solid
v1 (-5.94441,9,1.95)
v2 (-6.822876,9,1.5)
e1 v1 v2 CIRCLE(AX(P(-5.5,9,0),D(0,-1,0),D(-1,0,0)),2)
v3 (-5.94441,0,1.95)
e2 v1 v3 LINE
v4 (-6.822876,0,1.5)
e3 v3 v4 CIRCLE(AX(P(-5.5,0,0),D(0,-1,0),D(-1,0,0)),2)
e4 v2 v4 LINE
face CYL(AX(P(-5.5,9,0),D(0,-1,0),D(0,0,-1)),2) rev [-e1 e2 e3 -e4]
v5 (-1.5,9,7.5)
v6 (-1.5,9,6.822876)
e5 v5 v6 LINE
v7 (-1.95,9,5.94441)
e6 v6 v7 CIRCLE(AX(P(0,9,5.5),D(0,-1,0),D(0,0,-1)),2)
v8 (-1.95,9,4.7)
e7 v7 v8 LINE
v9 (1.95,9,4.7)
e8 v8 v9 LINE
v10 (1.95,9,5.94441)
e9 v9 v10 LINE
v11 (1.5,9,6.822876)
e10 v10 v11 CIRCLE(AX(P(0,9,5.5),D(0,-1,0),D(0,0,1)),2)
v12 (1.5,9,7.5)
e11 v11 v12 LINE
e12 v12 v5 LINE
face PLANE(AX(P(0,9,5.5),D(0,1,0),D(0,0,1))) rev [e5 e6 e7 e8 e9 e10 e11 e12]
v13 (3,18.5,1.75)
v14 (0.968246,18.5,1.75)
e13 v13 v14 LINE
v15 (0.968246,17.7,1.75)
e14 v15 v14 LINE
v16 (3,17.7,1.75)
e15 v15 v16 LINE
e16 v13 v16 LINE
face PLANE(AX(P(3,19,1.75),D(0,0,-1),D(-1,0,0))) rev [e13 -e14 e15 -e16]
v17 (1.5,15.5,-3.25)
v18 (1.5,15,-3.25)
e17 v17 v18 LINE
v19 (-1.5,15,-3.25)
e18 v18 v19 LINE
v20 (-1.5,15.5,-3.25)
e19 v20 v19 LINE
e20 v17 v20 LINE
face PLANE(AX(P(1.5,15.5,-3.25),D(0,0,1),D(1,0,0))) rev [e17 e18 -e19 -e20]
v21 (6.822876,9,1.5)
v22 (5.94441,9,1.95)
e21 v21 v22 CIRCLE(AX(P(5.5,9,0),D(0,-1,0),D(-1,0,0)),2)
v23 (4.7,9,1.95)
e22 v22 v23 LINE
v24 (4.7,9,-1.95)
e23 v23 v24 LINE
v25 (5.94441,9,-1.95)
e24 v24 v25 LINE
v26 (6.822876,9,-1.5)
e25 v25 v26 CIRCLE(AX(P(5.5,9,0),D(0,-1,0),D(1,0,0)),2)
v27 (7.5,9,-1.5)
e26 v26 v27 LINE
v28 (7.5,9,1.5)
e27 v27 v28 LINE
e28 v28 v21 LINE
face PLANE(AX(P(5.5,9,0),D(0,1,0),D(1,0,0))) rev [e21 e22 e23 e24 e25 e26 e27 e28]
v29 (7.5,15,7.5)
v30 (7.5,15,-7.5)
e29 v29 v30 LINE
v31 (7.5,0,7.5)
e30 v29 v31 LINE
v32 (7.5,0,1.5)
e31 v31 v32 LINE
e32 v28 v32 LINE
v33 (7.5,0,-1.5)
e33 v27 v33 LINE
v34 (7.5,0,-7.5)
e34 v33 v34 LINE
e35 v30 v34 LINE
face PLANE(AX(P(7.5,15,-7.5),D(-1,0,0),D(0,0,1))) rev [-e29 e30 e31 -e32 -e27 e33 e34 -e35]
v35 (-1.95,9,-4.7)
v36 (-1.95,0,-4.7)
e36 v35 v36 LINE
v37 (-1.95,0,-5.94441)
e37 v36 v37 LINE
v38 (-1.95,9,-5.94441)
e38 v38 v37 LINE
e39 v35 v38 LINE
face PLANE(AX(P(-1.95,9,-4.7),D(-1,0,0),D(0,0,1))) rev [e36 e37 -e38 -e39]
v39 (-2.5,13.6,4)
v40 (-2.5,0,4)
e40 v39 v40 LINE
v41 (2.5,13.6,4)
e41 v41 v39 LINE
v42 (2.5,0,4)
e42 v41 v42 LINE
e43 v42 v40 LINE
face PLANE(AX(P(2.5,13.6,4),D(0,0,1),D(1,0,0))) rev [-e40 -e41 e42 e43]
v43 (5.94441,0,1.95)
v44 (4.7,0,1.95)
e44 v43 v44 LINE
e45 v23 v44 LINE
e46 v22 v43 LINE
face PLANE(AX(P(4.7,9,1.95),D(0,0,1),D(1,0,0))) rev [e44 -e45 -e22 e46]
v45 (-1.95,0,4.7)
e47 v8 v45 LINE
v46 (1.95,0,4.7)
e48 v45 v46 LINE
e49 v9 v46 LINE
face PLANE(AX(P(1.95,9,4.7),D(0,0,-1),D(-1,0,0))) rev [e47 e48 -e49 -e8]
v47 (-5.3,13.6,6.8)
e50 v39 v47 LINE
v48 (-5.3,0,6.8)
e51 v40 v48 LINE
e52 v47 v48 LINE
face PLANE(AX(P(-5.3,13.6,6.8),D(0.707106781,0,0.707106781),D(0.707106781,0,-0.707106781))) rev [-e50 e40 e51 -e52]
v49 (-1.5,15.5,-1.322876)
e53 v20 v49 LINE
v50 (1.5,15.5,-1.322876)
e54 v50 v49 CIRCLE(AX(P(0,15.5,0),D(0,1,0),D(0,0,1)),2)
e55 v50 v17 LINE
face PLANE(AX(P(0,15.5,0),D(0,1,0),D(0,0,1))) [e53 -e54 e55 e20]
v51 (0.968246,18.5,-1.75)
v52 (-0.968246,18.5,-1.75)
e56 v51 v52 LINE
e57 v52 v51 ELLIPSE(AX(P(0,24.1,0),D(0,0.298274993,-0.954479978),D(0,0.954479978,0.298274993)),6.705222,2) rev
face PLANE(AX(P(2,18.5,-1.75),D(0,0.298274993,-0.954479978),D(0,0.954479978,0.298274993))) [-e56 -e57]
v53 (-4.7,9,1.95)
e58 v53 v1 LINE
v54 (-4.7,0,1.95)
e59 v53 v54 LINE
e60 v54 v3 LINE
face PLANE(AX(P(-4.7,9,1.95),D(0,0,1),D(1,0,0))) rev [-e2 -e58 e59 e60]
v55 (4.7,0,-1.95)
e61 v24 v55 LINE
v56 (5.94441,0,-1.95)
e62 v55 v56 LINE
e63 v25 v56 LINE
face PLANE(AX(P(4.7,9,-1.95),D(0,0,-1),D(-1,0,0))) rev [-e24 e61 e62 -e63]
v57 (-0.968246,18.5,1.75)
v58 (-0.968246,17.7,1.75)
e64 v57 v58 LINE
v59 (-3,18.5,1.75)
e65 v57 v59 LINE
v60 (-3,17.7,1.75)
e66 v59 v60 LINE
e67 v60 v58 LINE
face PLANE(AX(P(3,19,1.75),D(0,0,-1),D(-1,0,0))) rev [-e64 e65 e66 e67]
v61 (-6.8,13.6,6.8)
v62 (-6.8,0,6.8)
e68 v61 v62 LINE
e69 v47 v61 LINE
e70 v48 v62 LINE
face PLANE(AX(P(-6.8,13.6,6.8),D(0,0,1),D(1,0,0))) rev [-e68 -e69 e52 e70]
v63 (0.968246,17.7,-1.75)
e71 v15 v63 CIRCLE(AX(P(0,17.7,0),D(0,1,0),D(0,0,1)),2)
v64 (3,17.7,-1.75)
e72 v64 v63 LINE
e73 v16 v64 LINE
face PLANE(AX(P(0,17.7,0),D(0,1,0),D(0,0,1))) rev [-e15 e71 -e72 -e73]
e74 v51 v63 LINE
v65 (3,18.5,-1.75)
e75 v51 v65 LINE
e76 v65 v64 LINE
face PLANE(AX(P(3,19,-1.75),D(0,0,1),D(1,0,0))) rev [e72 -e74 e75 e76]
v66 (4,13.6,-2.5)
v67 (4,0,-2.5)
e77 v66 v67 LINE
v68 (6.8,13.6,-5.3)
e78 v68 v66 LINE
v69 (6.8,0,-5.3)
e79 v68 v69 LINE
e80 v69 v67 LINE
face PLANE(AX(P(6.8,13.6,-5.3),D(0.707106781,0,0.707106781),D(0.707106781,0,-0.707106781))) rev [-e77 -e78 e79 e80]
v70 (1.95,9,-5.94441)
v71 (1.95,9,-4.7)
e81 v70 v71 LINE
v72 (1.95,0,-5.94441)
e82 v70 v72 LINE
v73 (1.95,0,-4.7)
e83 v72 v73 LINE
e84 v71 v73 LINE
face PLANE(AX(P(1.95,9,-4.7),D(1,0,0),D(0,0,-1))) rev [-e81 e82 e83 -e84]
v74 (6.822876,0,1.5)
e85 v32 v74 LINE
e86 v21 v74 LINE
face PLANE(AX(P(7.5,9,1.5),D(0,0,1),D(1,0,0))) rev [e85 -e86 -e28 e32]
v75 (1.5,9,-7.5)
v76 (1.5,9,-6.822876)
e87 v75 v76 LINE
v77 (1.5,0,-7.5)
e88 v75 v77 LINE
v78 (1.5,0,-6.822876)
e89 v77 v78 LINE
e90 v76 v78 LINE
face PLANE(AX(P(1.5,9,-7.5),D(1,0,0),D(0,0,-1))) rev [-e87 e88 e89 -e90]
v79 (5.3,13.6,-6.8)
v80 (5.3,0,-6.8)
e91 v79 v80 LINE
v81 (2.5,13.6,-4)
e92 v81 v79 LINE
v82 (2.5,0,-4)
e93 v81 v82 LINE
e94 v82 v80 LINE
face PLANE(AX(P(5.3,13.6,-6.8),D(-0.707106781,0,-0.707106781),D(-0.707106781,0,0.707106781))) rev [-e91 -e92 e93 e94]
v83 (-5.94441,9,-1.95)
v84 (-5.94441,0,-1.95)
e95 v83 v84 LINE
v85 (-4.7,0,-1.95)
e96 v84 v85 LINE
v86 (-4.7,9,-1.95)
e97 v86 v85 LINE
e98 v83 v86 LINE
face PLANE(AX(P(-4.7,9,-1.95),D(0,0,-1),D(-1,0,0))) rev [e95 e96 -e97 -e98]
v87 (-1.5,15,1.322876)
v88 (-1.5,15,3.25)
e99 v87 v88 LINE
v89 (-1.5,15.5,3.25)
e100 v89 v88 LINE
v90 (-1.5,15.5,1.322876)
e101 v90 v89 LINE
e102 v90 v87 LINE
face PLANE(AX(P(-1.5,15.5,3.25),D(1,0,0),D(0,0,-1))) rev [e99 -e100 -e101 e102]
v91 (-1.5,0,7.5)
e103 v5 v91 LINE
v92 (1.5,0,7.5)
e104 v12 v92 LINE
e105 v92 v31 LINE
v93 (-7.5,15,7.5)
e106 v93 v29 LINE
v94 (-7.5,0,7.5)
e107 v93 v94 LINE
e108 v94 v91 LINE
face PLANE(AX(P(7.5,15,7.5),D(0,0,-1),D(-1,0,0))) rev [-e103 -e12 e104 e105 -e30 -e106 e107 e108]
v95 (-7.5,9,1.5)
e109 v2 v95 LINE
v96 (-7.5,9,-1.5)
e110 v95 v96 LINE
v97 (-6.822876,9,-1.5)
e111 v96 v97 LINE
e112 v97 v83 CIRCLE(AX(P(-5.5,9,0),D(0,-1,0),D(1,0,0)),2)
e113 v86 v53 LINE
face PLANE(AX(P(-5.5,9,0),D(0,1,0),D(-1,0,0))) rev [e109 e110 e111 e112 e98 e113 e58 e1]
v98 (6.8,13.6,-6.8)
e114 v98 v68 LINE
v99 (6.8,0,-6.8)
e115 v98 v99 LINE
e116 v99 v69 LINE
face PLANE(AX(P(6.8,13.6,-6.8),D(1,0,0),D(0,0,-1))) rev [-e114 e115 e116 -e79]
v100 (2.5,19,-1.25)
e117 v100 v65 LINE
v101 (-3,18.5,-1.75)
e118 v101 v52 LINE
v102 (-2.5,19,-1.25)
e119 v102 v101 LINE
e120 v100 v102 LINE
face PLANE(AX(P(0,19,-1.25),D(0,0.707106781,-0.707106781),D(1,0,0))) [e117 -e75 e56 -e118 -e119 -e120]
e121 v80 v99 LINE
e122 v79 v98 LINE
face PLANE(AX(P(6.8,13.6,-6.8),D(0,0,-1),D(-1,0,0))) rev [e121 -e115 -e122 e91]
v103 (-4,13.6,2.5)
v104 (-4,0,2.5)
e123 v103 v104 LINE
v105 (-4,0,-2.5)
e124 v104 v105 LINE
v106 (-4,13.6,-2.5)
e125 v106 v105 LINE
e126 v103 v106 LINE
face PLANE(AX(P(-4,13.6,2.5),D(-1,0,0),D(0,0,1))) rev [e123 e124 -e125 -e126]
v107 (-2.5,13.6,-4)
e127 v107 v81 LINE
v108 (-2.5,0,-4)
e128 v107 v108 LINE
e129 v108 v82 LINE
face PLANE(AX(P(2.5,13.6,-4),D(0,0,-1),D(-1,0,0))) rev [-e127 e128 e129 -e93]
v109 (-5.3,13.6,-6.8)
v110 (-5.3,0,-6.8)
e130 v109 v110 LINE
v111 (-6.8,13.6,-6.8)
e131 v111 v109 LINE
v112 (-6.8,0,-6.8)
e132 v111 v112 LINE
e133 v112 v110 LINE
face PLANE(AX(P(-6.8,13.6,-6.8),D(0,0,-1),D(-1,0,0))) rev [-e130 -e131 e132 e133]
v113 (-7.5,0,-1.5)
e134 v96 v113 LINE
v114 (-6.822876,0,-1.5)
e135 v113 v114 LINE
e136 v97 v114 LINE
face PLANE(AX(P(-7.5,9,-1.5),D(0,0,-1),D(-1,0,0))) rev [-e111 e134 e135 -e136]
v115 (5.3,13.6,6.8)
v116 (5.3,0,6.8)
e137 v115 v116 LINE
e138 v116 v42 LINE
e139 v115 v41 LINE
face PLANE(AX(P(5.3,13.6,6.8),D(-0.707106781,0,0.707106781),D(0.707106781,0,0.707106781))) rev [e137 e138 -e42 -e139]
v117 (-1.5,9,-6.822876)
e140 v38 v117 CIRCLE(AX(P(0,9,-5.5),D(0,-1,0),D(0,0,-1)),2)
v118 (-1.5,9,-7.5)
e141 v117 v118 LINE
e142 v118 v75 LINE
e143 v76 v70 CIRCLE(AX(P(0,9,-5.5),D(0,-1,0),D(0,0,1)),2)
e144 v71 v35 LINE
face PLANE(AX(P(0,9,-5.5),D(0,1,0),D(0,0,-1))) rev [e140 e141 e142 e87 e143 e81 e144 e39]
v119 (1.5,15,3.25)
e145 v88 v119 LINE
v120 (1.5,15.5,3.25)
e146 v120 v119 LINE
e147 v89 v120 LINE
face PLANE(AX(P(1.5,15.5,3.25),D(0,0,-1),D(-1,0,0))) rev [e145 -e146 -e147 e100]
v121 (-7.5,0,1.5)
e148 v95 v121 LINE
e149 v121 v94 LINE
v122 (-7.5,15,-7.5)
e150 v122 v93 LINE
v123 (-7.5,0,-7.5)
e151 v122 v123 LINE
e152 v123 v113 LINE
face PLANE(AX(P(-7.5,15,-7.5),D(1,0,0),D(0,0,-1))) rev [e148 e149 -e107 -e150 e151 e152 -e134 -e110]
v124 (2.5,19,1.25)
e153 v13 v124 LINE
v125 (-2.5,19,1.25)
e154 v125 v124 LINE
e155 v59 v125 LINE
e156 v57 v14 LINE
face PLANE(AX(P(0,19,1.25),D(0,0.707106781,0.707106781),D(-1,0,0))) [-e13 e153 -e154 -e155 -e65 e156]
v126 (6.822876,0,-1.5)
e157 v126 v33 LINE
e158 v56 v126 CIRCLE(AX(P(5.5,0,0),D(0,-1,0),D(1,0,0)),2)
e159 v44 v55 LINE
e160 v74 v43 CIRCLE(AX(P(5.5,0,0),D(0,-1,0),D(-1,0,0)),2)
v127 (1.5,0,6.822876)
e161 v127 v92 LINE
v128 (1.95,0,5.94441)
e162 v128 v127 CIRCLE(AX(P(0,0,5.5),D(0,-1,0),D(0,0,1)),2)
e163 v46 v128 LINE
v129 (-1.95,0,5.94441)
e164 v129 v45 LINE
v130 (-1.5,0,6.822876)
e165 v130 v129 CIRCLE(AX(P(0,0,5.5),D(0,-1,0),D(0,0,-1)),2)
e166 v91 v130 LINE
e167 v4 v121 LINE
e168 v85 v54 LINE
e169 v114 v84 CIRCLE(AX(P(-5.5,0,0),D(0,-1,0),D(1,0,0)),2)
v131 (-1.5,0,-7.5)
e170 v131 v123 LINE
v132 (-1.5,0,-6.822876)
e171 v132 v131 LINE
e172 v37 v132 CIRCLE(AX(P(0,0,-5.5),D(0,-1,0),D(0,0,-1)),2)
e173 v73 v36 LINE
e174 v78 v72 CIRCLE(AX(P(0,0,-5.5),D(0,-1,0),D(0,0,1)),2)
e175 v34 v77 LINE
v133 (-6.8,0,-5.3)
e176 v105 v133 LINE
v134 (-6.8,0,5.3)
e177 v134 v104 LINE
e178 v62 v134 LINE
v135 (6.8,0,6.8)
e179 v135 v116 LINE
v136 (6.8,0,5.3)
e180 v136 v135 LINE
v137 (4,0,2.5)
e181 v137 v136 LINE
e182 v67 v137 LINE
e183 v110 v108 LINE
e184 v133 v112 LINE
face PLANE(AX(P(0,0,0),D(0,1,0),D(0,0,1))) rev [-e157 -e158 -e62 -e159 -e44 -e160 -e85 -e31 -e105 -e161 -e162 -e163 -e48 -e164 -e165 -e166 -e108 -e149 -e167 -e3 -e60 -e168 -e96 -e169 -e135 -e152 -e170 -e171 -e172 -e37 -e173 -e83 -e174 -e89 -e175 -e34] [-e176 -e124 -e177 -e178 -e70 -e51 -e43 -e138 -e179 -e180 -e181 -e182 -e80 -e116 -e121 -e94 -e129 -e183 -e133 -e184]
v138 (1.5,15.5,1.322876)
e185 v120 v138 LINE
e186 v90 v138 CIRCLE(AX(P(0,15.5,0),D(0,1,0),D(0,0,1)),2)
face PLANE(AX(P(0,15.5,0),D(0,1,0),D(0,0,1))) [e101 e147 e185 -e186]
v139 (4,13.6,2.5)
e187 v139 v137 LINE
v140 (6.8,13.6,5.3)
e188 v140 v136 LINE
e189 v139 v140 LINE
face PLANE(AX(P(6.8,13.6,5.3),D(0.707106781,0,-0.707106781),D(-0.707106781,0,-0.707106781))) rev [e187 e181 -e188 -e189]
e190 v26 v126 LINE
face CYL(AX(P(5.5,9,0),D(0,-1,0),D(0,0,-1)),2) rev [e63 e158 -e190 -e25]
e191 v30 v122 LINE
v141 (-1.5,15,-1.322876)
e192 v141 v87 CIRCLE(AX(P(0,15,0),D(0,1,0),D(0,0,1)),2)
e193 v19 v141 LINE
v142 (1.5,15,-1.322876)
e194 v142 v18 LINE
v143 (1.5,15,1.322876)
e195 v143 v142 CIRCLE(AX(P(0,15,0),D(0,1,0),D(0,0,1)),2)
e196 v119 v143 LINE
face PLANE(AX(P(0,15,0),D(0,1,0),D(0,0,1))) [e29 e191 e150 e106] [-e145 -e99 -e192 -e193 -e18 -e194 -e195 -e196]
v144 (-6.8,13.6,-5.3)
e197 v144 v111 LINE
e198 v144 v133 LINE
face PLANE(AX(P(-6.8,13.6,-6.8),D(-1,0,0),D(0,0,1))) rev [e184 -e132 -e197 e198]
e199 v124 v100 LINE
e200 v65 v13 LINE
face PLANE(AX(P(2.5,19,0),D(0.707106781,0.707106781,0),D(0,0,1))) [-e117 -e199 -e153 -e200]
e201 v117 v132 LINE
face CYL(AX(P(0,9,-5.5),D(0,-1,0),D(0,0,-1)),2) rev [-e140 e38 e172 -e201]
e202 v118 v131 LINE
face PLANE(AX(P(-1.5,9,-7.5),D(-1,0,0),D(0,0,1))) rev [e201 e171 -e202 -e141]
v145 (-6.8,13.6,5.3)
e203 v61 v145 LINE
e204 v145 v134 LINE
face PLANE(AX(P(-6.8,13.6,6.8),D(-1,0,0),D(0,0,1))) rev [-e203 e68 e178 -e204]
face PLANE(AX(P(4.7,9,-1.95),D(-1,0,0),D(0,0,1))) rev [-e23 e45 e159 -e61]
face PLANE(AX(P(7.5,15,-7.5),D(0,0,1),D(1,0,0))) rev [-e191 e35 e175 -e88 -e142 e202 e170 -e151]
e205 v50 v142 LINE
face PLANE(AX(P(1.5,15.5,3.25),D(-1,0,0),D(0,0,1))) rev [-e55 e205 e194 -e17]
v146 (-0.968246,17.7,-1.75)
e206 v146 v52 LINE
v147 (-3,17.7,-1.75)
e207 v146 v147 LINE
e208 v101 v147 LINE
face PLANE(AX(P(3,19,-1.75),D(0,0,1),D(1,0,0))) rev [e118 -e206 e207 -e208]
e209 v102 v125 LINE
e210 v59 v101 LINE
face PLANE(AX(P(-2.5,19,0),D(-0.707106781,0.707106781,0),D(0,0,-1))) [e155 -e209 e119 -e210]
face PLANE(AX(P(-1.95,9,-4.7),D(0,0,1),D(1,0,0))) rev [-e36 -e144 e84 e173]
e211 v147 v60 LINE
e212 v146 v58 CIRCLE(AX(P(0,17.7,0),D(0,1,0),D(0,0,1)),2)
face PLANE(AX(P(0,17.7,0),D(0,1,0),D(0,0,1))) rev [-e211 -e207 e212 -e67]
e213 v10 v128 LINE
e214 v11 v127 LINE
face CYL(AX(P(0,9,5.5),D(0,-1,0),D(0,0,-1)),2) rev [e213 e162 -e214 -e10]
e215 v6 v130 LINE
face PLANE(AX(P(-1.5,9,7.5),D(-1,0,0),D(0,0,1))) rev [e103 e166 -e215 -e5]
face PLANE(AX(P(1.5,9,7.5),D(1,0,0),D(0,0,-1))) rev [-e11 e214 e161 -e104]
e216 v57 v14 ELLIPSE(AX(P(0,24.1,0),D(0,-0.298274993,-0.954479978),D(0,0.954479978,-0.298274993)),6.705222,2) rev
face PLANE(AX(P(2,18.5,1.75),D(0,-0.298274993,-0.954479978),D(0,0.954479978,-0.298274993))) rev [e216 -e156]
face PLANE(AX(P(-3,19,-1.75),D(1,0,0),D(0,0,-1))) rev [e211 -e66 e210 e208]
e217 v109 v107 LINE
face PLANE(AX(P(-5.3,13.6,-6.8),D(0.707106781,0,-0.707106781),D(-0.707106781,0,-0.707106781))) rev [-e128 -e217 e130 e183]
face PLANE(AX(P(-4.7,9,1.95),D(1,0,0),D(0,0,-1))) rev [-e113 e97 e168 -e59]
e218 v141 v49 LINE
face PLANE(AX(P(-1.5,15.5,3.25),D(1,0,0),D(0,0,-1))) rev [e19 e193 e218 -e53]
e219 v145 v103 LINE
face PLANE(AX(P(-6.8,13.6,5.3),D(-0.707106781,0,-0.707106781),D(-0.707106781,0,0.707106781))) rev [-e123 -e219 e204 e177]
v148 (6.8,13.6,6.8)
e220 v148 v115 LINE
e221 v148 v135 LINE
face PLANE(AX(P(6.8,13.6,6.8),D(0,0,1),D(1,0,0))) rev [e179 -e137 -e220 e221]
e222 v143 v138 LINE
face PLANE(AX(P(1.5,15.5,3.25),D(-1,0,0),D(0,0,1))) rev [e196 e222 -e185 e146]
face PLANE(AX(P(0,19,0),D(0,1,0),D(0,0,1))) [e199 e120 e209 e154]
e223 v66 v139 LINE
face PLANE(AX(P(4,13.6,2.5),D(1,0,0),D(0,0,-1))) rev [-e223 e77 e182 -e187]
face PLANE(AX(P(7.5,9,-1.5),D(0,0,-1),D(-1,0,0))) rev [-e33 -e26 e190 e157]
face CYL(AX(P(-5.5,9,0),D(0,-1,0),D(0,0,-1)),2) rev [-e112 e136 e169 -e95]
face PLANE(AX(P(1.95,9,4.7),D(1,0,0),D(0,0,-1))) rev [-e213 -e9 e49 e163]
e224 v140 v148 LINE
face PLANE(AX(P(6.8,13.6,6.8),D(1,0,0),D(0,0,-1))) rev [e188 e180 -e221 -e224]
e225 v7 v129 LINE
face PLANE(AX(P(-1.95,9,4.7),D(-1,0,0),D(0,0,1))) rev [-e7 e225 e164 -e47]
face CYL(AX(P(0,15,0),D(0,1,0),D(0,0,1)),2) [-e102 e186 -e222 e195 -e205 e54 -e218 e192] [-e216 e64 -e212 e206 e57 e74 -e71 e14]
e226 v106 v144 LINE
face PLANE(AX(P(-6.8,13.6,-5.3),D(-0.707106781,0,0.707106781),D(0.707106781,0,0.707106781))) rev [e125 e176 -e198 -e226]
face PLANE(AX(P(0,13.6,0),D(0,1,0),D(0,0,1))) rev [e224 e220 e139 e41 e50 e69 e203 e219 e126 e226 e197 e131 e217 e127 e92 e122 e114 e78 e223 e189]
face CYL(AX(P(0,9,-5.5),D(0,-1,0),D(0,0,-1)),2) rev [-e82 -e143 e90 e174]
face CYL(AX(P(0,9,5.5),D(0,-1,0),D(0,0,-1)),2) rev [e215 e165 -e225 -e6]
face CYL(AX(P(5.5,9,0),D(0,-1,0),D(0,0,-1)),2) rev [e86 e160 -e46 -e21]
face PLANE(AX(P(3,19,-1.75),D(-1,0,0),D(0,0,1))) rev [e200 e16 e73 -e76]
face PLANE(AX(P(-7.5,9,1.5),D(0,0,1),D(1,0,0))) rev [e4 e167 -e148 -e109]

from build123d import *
from build123d.topology import SkipClean

# Parameters (mm, degrees)
SKETCH_1_W               = 15
SKETCH_1_H               = 15
EXTRUDE_1_DEPTH          = 15
CUT_EXTRUDE_1_DEPTH      = 9
SKETCH_4_W               = 3
SKETCH_4_H               = 6.5
EXTRUDE_2_DEPTH          = 0.5
EXTRUDE_3_DEPTH          = 2.2
EXTRUDE_3_DEPTH_BACK     = 0.5
SKETCH_6_R               = 2
SKETCH_7_W               = 6
SKETCH_7_H               = 3.5
EXTRUDE_4_DEPTH          = 1.3
EXTRUDE_START            = 0.8
SKETCH_8_R               = 2
EXTRUDE_5_DEPTH          = 0.8
CHAMFER_1_SIZE           = 0.5
CUT_EXTRUDE_2_DEPTH      = 2
CUT_EXTRUDE_2_DEPTH_BACK = 2
PATTERN_CIRCULAR_1_COUNT = 4
CUT_EXTRUDE_3_DEPTH      = 13.6


with BuildPart() as part:
    # 草图1 → 凸台-拉伸1 (new body)
    with BuildSketch(Plane(origin=(0, 0, 0), x_dir=(1, 0, 0), z_dir=(0, 1, 0))):
        Rectangle(SKETCH_1_W, SKETCH_1_H)
    extrude(amount=EXTRUDE_1_DEPTH)

    # 草图2 → 切除-拉伸1 (cut)
    with BuildSketch(Plane.XZ):
        with BuildLine():
            Line((1.5, 7.5), (-1.5, 7.5))
            Line((-1.5, 7.5), (-1.5, 6.822875656))
            ThreePointArc((-1.5, 6.822875656), (-1.780042303, 6.411838473), (-1.95, 5.944409721))
            Line((-1.95, 5.944409721), (-1.95, 4.7))
            Line((-1.95, 4.7), (1.95, 4.7))
            Line((1.95, 4.7), (1.95, 5.944409721))
            ThreePointArc((1.95, 5.944409721), (1.780042303, 6.411838473), (1.5, 6.822875656))
            Line((1.5, 6.822875656), (1.5, 7.5))
        make_face()
    cut_extrude_1 = extrude(amount=-CUT_EXTRUDE_1_DEPTH, mode=Mode.SUBTRACT)

    # 草图4 → 凸台-拉伸2 (add)
    with BuildSketch(Plane(origin=(0, 15, 0), x_dir=(1, 0, 0), z_dir=(0, 1, 0))):
        Rectangle(SKETCH_4_W, SKETCH_4_H)
    extrude(amount=EXTRUDE_2_DEPTH)

    # 草图6 → 凸台-拉伸3 (add, two sides: drawn at the far end of the back side and taken through both)
    with BuildSketch(Plane(origin=(0, 15.5, 0), x_dir=(1, 0, 0), z_dir=(0, 1, 0)).offset(-EXTRUDE_3_DEPTH_BACK)):
        with Locations(Location((0, 0, 0), (0, 0, 270))):
            Circle(SKETCH_6_R)
    extrude(amount=EXTRUDE_3_DEPTH + EXTRUDE_3_DEPTH_BACK)

    # 草图7 → 凸台-拉伸4 (add)
    with BuildSketch(Plane(origin=(0, 17.7, 0), x_dir=(1, 0, 0), z_dir=(0, 1, 0))):
        Rectangle(SKETCH_7_W, SKETCH_7_H)
    extrude(amount=EXTRUDE_4_DEPTH)

    # 草图8 → 凸台-拉伸5 (add)
    with SkipClean():  # the faces are left unmerged after this step: merging them gives an invalid solid
        with BuildSketch(Plane(origin=(0, 17.7, 0), x_dir=(1, 0, 0), z_dir=(0, 1, 0)).offset(EXTRUDE_START)):
            with Locations(Location((0, 0, 0), (0, 0, 298.955024372))):
                Circle(SKETCH_8_R)
        extrude(amount=-EXTRUDE_5_DEPTH)
    add(part.part.scale(1), mode=Mode.REPLACE)  # the faces are merged on a copy

    # 倒角1
    chamfer_1_edges = [part.edges().sort_by_distance(p)[0] for p in [
        (0, 19, -1.75),
        (-3, 19, 0),
        (0, 19, 1.75),
        (3, 19, 0),
    ]]
    chamfer(chamfer_1_edges, length=CHAMFER_1_SIZE - 0.0001)  # a hair under: the kernel refuses the full size

    # 草图9 → 切除-拉伸2 (cut, two sides: drawn at the far end of the back side and taken through both)
    with BuildSketch(Plane(origin=(0, 0, 0), x_dir=(0, 0, -1), z_dir=(1, 0, 0)).offset(-CUT_EXTRUDE_2_DEPTH_BACK)):
        Polygon((-2, 17.7), (-2, 18.5), (-1.75, 18.5), align=None)
        Polygon((1.75, 18.5), (2, 17.7), (2, 18.5), align=None)
    extrude(amount=CUT_EXTRUDE_2_DEPTH + CUT_EXTRUDE_2_DEPTH_BACK, mode=Mode.SUBTRACT)

    # 阵列(圆周)1: 切除-拉伸1 ×4 about axis
    pattern_circular_1_axis = Axis((0, 0, 0), (0, 1, 0))
    for i in range(1, PATTERN_CIRCULAR_1_COUNT):
        add(cut_extrude_1.rotate(pattern_circular_1_axis, i * 360 / PATTERN_CIRCULAR_1_COUNT), mode=Mode.SUBTRACT)

    # 草图10 → 切除-拉伸3 (cut)
    with BuildSketch(Plane.XZ):
        Polygon((6.8, 6.8), (6.8, 5.3), (4, 2.5), (4, -2.5), (6.8, -5.3), (6.8, -6.8), (5.3, -6.8), (2.5, -4), (-2.5, -4), (-5.3, -6.8), (-6.8, -6.8), (-6.8, -5.3), (-4, -2.5), (-4, 2.5), (-6.8, 5.3), (-6.8, 6.8), (-5.3, 6.8), (-2.5, 4), (2.5, 4), (5.3, 6.8), align=None)
    extrude(amount=-CUT_EXTRUDE_3_DEPTH, mode=Mode.SUBTRACT)


solid = part.part
